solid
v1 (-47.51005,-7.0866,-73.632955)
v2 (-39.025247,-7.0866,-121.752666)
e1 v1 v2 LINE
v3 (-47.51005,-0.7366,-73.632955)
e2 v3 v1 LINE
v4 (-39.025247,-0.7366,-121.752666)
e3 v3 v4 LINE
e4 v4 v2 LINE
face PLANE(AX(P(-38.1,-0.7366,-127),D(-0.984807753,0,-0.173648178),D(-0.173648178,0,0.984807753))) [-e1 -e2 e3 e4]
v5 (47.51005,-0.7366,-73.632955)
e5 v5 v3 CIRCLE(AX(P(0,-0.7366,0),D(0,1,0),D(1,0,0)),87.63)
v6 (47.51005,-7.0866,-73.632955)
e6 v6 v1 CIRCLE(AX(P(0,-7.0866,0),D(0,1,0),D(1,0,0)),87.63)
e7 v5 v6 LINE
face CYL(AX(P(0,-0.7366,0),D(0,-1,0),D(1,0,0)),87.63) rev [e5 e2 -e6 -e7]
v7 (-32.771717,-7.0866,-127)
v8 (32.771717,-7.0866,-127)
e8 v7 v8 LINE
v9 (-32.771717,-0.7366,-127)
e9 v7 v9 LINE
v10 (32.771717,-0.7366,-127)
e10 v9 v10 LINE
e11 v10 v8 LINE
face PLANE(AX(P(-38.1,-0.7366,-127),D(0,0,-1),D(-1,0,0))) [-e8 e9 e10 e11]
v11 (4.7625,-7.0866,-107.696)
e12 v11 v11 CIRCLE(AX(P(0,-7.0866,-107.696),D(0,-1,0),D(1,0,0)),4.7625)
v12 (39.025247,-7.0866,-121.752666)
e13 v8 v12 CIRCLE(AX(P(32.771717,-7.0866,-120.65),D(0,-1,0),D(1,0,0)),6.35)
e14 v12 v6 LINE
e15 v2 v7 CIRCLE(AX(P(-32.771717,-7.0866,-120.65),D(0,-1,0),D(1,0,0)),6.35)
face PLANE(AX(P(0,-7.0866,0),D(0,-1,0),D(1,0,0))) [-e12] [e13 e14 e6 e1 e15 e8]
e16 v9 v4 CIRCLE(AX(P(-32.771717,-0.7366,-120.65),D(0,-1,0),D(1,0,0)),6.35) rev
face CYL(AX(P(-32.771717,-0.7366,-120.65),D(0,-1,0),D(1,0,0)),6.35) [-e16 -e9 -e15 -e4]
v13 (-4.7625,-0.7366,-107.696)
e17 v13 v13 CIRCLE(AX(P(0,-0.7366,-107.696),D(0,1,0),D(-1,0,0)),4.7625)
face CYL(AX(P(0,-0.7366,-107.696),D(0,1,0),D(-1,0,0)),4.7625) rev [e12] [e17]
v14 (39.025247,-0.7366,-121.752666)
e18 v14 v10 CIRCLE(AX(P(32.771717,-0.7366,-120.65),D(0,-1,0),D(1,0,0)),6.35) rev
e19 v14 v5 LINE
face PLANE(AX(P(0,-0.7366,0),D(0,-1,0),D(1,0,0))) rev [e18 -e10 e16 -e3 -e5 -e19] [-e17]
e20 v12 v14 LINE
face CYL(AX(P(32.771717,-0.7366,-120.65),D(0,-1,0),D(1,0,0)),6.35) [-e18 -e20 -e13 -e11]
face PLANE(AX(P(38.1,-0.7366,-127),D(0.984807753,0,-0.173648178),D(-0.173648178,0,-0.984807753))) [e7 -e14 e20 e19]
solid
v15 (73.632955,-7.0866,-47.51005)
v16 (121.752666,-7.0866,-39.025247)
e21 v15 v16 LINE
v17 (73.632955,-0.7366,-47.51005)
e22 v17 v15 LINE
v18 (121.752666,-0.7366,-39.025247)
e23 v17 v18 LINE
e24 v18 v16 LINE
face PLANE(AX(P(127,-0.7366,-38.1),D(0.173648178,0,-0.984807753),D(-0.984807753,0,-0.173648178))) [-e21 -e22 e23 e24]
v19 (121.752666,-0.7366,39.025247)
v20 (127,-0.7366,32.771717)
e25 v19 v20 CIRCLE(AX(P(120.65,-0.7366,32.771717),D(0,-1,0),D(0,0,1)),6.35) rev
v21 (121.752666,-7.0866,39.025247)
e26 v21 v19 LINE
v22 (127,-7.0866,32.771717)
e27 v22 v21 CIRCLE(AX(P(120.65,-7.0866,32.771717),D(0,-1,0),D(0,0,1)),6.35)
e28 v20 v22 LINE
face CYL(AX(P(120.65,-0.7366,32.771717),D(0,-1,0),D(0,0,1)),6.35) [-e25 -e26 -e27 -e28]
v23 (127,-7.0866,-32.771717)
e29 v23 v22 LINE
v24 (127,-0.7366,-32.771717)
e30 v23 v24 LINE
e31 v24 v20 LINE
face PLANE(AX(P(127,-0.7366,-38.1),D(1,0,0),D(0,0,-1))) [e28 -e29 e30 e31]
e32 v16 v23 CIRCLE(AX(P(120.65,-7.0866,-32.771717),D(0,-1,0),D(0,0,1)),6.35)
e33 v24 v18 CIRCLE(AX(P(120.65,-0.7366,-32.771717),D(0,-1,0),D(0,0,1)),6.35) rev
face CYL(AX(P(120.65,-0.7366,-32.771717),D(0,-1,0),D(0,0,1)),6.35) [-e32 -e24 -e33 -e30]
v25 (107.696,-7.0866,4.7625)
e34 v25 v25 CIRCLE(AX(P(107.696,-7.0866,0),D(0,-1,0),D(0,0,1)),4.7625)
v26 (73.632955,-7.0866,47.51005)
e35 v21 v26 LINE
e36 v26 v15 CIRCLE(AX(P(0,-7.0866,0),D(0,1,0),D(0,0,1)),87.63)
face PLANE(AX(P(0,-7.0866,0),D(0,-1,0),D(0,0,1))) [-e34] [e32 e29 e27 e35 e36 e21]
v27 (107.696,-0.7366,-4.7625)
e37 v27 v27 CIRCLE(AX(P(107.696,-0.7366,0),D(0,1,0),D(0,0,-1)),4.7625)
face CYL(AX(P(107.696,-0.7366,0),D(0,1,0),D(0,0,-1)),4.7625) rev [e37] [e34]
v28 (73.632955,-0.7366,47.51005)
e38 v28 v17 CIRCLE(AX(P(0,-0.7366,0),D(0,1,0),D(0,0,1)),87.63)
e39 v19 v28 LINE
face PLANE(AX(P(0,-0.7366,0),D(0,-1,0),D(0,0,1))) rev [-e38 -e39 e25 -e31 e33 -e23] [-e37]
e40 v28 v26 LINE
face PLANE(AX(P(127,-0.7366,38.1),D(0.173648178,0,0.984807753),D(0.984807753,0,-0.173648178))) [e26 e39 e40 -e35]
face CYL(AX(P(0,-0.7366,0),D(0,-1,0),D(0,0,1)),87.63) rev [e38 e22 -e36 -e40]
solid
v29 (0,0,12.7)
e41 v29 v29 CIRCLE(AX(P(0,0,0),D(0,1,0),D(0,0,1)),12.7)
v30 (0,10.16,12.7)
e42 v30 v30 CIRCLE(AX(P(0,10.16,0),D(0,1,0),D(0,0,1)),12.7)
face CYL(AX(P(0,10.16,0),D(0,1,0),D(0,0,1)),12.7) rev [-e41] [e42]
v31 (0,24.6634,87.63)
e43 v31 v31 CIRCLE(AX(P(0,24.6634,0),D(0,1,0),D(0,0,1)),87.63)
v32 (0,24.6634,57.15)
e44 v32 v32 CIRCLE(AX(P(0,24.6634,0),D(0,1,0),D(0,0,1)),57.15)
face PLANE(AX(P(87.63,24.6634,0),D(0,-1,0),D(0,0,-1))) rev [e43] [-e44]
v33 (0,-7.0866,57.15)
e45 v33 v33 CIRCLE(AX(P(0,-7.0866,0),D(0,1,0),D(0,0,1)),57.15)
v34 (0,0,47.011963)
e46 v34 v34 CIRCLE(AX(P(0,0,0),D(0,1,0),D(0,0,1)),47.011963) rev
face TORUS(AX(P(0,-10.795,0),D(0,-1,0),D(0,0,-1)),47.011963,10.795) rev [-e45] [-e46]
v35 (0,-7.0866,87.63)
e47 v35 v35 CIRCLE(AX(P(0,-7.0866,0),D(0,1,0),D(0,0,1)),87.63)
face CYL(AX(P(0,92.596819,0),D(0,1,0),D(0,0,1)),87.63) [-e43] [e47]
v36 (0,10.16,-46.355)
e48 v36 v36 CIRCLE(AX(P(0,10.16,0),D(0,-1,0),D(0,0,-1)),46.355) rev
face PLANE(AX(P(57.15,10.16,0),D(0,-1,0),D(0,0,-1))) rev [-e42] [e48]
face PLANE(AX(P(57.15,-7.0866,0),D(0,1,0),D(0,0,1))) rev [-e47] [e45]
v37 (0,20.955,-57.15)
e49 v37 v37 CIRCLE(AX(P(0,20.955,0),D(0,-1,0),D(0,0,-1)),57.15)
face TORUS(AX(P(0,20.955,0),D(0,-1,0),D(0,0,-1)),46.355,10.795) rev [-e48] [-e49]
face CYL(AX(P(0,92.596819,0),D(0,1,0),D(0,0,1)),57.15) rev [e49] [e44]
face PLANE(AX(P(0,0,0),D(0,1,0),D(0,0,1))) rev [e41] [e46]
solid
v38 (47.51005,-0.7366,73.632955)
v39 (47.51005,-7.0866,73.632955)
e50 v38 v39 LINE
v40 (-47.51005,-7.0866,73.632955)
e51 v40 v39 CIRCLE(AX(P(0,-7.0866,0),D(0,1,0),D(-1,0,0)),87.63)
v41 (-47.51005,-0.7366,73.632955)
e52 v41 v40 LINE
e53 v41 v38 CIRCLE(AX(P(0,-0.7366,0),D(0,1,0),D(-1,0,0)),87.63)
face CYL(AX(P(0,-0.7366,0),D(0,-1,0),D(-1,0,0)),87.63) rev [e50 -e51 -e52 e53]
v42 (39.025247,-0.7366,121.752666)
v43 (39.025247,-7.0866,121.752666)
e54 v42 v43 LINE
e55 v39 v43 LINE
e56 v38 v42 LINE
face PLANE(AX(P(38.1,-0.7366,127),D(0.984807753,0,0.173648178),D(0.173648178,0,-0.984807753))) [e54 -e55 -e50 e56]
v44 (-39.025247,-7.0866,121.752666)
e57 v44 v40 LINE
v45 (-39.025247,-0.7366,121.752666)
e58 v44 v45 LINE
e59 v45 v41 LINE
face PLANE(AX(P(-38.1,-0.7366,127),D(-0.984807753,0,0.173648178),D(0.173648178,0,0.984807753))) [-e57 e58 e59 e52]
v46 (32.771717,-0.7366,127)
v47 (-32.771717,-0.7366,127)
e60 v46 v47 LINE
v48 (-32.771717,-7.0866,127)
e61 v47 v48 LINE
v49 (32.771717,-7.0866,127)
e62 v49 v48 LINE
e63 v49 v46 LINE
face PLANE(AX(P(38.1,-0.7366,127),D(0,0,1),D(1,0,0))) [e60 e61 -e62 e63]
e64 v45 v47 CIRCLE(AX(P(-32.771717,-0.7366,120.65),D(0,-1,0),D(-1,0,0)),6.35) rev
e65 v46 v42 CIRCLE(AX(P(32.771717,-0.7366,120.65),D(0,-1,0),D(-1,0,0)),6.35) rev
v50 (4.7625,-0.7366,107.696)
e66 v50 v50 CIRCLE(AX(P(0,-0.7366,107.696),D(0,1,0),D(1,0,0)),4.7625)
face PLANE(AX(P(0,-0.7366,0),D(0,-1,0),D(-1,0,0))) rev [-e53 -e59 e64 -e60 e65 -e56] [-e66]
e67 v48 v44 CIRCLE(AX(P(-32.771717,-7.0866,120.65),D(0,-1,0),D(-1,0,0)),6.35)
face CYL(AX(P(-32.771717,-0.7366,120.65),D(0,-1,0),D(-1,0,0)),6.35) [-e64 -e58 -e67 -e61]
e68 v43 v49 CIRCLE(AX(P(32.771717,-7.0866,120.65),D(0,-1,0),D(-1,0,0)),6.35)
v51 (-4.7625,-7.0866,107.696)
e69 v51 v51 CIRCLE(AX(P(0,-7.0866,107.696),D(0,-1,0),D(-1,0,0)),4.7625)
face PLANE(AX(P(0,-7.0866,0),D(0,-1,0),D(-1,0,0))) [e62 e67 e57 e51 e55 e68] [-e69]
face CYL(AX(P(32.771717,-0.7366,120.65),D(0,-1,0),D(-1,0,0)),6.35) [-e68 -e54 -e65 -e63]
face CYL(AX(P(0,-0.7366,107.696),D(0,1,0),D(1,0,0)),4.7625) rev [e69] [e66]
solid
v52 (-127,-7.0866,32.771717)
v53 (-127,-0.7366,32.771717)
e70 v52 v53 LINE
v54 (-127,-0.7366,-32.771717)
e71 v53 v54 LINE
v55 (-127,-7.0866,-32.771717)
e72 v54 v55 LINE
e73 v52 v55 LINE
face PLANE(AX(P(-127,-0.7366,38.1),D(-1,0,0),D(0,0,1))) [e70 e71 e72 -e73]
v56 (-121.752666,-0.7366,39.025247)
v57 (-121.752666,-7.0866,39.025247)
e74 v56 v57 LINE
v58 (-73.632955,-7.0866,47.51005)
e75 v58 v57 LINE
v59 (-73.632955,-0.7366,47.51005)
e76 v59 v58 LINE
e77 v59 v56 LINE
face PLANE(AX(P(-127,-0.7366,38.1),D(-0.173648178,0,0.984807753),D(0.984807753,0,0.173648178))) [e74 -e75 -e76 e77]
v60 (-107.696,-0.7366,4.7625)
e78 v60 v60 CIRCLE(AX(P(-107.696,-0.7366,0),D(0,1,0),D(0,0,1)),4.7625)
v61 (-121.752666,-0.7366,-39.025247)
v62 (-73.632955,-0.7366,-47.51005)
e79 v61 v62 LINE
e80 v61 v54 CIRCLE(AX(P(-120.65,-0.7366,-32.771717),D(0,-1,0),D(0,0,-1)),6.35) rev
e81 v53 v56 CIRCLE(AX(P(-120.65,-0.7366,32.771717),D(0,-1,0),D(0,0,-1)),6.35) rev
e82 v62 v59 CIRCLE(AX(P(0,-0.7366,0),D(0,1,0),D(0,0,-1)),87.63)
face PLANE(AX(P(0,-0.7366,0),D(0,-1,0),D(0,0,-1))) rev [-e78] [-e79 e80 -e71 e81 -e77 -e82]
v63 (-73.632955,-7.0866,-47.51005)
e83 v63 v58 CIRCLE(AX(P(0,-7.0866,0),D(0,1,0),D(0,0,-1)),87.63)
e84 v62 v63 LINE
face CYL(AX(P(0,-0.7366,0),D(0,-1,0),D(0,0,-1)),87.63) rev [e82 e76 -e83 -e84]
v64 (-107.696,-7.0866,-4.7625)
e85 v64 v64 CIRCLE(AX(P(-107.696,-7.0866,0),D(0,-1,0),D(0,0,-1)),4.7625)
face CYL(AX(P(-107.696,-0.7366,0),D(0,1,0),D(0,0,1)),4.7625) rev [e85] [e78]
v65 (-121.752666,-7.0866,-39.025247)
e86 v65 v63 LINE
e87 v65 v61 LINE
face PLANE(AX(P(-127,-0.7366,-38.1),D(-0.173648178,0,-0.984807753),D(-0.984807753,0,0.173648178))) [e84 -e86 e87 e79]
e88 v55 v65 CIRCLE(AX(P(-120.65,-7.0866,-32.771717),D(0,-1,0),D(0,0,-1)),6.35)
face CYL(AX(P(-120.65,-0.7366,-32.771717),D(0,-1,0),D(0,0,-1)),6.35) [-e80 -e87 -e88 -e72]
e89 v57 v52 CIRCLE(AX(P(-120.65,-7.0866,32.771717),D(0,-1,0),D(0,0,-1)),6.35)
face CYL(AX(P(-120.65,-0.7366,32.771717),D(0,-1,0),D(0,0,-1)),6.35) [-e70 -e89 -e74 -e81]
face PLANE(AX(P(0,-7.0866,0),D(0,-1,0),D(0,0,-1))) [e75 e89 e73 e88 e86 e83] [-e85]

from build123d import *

# Parameters (mm, degrees)
F_1_1_DIAMETER_HOLE1_D = 25.4
BOSS_EXTRUDE1_DEPTH    = 6.35
FILLET2_R              = 6.35
CIRPATTERN4_COUNT      = 4
FILLET3_R              = 10.795


with BuildPart() as part:
    # Sketch1 → Revolve1 (revolve)
    with BuildSketch(Plane.XY, mode=Mode.PRIVATE) as revolve1_sk:
        Polygon((87.63, -7.0866), (87.63, 24.6634), (57.15, 24.6634), (57.15, 10.16), (0, 10.16), (0, 0), (57.15, 0), (57.15, -7.0866), align=None)
    revolve(revolve1_sk.sketch.rotate(Axis((0, 92.596818824, 0), (0, -1, 0)), 90), axis=Axis((0, 92.596818824, 0), (0, -1, 0)))

    # 1 (1) Diameter Hole1 (through all)
    with Locations(Plane(origin=(0, 10.16, 0), x_dir=(1, 0, 0), z_dir=(0, 1, 0))):
        with Locations((0, 0)):
            Hole(F_1_1_DIAMETER_HOLE1_D / 2)

    # Fillet3
    # the kernel refuses this fillet: 10.795 mm, written as the material it adds along each edge
    with BuildSketch(Plane(origin=(0, 0, 0), x_dir=(0, 0, 1), z_dir=(1, 0, 0))) as fillet3_piece_1:
        with BuildLine():
            CenterArc((47.011962989, 10.795), FILLET3_R, 270, 69.907948581)
            Line((47.011962989, 0), (47.011962989, -0.2159))
            Line((47.011962989, -0.2159), (57.15, -0.2159))
            Line((57.15, -0.2159), (57.3659, 0))
            ThreePointArc((57.3659, 0), (57.3659, 3.5433), (57.35276074, 7.012432))
            Line((57.35276074, 7.012432), (57.15, 7.0866))
        make_face()
    revolve(axis=Axis((0, 0, 0), (0, -1, 0)))
    with BuildSketch(Plane(origin=(0, 10.16, 0), x_dir=(0, 0, 1), z_dir=(1, 0, 0))) as fillet3_piece_2:
        with BuildLine():
            CenterArc((57.15 - FILLET3_R, -FILLET3_R), FILLET3_R, 0, 90)
            Line((57.15 - FILLET3_R, 0), (57.15 - FILLET3_R, FILLET3_R * 0.02))
            Line((57.15 - FILLET3_R, FILLET3_R * 0.02), (57.15 + FILLET3_R * 0.02, FILLET3_R * 0.02))
            Line((57.15 + FILLET3_R * 0.02, FILLET3_R * 0.02), (57.15 + FILLET3_R * 0.02, -FILLET3_R))
            Line((57.15 + FILLET3_R * 0.02, -FILLET3_R), (57.15, -FILLET3_R))
        make_face()
    revolve(axis=Axis((0, 10.16, 0), (0, -1, 0)))


with BuildPart() as body_2:
    # Sketch15 → Boss-Extrude1 (new body)
    with BuildSketch(Plane.XZ.offset(7.0866)):
        with BuildLine():
            Line((-127, -38.1), (-73.632954963, -47.510049921))
            ThreePointArc((-73.632954963, -47.510049921), (-87.63, 0), (-73.632954963, 47.510049921))
            Line((-73.632954963, 47.510049921), (-127, 38.1))
            Line((-127, 38.1), (-127, -38.1))
        make_face()
    extrude(amount=-BOSS_EXTRUDE1_DEPTH)

    # Fillet2
    fillet2_edges = [body_2.edges().sort_by_distance(p)[0] for p in [
        (-127, -3.9116, 38.1),
        (-127, -3.9116, -38.1),
    ]]
    fillet(fillet2_edges, radius=FILLET2_R)

    # Sketch17 → 3/8 (0.375) Diameter Hole1 (revolve, cut)
    with BuildSketch(Plane(origin=(-107.696, -0.7366, 0), x_dir=(0, 0, 1), z_dir=(1, 0, 0))):
        Polygon((0, 0), (0, 28.261598698), (4.7625, 25.4), (4.7625, 0), align=None)
    revolve(axis=Axis((-107.696, 5.6134, 0), (0, -1, 0)), mode=Mode.SUBTRACT)


with BuildPart() as cirpattern4_1:
    # CirPattern4: pattern copy
    add(body_2.part.rotate(Axis((0, 0, 0), (0, 1, 0)), 1 * 360 / CIRPATTERN4_COUNT))


with BuildPart() as cirpattern4_2:
    # CirPattern4: pattern copy
    add(body_2.part.rotate(Axis((0, 0, 0), (0, 1, 0)), 2 * 360 / CIRPATTERN4_COUNT))


with BuildPart() as cirpattern4_3:
    # CirPattern4: pattern copy
    add(body_2.part.rotate(Axis((0, 0, 0), (0, 1, 0)), 3 * 360 / CIRPATTERN4_COUNT))


solid = Compound([part.part, body_2.part, cirpattern4_1.part, cirpattern4_2.part, cirpattern4_3.part])
